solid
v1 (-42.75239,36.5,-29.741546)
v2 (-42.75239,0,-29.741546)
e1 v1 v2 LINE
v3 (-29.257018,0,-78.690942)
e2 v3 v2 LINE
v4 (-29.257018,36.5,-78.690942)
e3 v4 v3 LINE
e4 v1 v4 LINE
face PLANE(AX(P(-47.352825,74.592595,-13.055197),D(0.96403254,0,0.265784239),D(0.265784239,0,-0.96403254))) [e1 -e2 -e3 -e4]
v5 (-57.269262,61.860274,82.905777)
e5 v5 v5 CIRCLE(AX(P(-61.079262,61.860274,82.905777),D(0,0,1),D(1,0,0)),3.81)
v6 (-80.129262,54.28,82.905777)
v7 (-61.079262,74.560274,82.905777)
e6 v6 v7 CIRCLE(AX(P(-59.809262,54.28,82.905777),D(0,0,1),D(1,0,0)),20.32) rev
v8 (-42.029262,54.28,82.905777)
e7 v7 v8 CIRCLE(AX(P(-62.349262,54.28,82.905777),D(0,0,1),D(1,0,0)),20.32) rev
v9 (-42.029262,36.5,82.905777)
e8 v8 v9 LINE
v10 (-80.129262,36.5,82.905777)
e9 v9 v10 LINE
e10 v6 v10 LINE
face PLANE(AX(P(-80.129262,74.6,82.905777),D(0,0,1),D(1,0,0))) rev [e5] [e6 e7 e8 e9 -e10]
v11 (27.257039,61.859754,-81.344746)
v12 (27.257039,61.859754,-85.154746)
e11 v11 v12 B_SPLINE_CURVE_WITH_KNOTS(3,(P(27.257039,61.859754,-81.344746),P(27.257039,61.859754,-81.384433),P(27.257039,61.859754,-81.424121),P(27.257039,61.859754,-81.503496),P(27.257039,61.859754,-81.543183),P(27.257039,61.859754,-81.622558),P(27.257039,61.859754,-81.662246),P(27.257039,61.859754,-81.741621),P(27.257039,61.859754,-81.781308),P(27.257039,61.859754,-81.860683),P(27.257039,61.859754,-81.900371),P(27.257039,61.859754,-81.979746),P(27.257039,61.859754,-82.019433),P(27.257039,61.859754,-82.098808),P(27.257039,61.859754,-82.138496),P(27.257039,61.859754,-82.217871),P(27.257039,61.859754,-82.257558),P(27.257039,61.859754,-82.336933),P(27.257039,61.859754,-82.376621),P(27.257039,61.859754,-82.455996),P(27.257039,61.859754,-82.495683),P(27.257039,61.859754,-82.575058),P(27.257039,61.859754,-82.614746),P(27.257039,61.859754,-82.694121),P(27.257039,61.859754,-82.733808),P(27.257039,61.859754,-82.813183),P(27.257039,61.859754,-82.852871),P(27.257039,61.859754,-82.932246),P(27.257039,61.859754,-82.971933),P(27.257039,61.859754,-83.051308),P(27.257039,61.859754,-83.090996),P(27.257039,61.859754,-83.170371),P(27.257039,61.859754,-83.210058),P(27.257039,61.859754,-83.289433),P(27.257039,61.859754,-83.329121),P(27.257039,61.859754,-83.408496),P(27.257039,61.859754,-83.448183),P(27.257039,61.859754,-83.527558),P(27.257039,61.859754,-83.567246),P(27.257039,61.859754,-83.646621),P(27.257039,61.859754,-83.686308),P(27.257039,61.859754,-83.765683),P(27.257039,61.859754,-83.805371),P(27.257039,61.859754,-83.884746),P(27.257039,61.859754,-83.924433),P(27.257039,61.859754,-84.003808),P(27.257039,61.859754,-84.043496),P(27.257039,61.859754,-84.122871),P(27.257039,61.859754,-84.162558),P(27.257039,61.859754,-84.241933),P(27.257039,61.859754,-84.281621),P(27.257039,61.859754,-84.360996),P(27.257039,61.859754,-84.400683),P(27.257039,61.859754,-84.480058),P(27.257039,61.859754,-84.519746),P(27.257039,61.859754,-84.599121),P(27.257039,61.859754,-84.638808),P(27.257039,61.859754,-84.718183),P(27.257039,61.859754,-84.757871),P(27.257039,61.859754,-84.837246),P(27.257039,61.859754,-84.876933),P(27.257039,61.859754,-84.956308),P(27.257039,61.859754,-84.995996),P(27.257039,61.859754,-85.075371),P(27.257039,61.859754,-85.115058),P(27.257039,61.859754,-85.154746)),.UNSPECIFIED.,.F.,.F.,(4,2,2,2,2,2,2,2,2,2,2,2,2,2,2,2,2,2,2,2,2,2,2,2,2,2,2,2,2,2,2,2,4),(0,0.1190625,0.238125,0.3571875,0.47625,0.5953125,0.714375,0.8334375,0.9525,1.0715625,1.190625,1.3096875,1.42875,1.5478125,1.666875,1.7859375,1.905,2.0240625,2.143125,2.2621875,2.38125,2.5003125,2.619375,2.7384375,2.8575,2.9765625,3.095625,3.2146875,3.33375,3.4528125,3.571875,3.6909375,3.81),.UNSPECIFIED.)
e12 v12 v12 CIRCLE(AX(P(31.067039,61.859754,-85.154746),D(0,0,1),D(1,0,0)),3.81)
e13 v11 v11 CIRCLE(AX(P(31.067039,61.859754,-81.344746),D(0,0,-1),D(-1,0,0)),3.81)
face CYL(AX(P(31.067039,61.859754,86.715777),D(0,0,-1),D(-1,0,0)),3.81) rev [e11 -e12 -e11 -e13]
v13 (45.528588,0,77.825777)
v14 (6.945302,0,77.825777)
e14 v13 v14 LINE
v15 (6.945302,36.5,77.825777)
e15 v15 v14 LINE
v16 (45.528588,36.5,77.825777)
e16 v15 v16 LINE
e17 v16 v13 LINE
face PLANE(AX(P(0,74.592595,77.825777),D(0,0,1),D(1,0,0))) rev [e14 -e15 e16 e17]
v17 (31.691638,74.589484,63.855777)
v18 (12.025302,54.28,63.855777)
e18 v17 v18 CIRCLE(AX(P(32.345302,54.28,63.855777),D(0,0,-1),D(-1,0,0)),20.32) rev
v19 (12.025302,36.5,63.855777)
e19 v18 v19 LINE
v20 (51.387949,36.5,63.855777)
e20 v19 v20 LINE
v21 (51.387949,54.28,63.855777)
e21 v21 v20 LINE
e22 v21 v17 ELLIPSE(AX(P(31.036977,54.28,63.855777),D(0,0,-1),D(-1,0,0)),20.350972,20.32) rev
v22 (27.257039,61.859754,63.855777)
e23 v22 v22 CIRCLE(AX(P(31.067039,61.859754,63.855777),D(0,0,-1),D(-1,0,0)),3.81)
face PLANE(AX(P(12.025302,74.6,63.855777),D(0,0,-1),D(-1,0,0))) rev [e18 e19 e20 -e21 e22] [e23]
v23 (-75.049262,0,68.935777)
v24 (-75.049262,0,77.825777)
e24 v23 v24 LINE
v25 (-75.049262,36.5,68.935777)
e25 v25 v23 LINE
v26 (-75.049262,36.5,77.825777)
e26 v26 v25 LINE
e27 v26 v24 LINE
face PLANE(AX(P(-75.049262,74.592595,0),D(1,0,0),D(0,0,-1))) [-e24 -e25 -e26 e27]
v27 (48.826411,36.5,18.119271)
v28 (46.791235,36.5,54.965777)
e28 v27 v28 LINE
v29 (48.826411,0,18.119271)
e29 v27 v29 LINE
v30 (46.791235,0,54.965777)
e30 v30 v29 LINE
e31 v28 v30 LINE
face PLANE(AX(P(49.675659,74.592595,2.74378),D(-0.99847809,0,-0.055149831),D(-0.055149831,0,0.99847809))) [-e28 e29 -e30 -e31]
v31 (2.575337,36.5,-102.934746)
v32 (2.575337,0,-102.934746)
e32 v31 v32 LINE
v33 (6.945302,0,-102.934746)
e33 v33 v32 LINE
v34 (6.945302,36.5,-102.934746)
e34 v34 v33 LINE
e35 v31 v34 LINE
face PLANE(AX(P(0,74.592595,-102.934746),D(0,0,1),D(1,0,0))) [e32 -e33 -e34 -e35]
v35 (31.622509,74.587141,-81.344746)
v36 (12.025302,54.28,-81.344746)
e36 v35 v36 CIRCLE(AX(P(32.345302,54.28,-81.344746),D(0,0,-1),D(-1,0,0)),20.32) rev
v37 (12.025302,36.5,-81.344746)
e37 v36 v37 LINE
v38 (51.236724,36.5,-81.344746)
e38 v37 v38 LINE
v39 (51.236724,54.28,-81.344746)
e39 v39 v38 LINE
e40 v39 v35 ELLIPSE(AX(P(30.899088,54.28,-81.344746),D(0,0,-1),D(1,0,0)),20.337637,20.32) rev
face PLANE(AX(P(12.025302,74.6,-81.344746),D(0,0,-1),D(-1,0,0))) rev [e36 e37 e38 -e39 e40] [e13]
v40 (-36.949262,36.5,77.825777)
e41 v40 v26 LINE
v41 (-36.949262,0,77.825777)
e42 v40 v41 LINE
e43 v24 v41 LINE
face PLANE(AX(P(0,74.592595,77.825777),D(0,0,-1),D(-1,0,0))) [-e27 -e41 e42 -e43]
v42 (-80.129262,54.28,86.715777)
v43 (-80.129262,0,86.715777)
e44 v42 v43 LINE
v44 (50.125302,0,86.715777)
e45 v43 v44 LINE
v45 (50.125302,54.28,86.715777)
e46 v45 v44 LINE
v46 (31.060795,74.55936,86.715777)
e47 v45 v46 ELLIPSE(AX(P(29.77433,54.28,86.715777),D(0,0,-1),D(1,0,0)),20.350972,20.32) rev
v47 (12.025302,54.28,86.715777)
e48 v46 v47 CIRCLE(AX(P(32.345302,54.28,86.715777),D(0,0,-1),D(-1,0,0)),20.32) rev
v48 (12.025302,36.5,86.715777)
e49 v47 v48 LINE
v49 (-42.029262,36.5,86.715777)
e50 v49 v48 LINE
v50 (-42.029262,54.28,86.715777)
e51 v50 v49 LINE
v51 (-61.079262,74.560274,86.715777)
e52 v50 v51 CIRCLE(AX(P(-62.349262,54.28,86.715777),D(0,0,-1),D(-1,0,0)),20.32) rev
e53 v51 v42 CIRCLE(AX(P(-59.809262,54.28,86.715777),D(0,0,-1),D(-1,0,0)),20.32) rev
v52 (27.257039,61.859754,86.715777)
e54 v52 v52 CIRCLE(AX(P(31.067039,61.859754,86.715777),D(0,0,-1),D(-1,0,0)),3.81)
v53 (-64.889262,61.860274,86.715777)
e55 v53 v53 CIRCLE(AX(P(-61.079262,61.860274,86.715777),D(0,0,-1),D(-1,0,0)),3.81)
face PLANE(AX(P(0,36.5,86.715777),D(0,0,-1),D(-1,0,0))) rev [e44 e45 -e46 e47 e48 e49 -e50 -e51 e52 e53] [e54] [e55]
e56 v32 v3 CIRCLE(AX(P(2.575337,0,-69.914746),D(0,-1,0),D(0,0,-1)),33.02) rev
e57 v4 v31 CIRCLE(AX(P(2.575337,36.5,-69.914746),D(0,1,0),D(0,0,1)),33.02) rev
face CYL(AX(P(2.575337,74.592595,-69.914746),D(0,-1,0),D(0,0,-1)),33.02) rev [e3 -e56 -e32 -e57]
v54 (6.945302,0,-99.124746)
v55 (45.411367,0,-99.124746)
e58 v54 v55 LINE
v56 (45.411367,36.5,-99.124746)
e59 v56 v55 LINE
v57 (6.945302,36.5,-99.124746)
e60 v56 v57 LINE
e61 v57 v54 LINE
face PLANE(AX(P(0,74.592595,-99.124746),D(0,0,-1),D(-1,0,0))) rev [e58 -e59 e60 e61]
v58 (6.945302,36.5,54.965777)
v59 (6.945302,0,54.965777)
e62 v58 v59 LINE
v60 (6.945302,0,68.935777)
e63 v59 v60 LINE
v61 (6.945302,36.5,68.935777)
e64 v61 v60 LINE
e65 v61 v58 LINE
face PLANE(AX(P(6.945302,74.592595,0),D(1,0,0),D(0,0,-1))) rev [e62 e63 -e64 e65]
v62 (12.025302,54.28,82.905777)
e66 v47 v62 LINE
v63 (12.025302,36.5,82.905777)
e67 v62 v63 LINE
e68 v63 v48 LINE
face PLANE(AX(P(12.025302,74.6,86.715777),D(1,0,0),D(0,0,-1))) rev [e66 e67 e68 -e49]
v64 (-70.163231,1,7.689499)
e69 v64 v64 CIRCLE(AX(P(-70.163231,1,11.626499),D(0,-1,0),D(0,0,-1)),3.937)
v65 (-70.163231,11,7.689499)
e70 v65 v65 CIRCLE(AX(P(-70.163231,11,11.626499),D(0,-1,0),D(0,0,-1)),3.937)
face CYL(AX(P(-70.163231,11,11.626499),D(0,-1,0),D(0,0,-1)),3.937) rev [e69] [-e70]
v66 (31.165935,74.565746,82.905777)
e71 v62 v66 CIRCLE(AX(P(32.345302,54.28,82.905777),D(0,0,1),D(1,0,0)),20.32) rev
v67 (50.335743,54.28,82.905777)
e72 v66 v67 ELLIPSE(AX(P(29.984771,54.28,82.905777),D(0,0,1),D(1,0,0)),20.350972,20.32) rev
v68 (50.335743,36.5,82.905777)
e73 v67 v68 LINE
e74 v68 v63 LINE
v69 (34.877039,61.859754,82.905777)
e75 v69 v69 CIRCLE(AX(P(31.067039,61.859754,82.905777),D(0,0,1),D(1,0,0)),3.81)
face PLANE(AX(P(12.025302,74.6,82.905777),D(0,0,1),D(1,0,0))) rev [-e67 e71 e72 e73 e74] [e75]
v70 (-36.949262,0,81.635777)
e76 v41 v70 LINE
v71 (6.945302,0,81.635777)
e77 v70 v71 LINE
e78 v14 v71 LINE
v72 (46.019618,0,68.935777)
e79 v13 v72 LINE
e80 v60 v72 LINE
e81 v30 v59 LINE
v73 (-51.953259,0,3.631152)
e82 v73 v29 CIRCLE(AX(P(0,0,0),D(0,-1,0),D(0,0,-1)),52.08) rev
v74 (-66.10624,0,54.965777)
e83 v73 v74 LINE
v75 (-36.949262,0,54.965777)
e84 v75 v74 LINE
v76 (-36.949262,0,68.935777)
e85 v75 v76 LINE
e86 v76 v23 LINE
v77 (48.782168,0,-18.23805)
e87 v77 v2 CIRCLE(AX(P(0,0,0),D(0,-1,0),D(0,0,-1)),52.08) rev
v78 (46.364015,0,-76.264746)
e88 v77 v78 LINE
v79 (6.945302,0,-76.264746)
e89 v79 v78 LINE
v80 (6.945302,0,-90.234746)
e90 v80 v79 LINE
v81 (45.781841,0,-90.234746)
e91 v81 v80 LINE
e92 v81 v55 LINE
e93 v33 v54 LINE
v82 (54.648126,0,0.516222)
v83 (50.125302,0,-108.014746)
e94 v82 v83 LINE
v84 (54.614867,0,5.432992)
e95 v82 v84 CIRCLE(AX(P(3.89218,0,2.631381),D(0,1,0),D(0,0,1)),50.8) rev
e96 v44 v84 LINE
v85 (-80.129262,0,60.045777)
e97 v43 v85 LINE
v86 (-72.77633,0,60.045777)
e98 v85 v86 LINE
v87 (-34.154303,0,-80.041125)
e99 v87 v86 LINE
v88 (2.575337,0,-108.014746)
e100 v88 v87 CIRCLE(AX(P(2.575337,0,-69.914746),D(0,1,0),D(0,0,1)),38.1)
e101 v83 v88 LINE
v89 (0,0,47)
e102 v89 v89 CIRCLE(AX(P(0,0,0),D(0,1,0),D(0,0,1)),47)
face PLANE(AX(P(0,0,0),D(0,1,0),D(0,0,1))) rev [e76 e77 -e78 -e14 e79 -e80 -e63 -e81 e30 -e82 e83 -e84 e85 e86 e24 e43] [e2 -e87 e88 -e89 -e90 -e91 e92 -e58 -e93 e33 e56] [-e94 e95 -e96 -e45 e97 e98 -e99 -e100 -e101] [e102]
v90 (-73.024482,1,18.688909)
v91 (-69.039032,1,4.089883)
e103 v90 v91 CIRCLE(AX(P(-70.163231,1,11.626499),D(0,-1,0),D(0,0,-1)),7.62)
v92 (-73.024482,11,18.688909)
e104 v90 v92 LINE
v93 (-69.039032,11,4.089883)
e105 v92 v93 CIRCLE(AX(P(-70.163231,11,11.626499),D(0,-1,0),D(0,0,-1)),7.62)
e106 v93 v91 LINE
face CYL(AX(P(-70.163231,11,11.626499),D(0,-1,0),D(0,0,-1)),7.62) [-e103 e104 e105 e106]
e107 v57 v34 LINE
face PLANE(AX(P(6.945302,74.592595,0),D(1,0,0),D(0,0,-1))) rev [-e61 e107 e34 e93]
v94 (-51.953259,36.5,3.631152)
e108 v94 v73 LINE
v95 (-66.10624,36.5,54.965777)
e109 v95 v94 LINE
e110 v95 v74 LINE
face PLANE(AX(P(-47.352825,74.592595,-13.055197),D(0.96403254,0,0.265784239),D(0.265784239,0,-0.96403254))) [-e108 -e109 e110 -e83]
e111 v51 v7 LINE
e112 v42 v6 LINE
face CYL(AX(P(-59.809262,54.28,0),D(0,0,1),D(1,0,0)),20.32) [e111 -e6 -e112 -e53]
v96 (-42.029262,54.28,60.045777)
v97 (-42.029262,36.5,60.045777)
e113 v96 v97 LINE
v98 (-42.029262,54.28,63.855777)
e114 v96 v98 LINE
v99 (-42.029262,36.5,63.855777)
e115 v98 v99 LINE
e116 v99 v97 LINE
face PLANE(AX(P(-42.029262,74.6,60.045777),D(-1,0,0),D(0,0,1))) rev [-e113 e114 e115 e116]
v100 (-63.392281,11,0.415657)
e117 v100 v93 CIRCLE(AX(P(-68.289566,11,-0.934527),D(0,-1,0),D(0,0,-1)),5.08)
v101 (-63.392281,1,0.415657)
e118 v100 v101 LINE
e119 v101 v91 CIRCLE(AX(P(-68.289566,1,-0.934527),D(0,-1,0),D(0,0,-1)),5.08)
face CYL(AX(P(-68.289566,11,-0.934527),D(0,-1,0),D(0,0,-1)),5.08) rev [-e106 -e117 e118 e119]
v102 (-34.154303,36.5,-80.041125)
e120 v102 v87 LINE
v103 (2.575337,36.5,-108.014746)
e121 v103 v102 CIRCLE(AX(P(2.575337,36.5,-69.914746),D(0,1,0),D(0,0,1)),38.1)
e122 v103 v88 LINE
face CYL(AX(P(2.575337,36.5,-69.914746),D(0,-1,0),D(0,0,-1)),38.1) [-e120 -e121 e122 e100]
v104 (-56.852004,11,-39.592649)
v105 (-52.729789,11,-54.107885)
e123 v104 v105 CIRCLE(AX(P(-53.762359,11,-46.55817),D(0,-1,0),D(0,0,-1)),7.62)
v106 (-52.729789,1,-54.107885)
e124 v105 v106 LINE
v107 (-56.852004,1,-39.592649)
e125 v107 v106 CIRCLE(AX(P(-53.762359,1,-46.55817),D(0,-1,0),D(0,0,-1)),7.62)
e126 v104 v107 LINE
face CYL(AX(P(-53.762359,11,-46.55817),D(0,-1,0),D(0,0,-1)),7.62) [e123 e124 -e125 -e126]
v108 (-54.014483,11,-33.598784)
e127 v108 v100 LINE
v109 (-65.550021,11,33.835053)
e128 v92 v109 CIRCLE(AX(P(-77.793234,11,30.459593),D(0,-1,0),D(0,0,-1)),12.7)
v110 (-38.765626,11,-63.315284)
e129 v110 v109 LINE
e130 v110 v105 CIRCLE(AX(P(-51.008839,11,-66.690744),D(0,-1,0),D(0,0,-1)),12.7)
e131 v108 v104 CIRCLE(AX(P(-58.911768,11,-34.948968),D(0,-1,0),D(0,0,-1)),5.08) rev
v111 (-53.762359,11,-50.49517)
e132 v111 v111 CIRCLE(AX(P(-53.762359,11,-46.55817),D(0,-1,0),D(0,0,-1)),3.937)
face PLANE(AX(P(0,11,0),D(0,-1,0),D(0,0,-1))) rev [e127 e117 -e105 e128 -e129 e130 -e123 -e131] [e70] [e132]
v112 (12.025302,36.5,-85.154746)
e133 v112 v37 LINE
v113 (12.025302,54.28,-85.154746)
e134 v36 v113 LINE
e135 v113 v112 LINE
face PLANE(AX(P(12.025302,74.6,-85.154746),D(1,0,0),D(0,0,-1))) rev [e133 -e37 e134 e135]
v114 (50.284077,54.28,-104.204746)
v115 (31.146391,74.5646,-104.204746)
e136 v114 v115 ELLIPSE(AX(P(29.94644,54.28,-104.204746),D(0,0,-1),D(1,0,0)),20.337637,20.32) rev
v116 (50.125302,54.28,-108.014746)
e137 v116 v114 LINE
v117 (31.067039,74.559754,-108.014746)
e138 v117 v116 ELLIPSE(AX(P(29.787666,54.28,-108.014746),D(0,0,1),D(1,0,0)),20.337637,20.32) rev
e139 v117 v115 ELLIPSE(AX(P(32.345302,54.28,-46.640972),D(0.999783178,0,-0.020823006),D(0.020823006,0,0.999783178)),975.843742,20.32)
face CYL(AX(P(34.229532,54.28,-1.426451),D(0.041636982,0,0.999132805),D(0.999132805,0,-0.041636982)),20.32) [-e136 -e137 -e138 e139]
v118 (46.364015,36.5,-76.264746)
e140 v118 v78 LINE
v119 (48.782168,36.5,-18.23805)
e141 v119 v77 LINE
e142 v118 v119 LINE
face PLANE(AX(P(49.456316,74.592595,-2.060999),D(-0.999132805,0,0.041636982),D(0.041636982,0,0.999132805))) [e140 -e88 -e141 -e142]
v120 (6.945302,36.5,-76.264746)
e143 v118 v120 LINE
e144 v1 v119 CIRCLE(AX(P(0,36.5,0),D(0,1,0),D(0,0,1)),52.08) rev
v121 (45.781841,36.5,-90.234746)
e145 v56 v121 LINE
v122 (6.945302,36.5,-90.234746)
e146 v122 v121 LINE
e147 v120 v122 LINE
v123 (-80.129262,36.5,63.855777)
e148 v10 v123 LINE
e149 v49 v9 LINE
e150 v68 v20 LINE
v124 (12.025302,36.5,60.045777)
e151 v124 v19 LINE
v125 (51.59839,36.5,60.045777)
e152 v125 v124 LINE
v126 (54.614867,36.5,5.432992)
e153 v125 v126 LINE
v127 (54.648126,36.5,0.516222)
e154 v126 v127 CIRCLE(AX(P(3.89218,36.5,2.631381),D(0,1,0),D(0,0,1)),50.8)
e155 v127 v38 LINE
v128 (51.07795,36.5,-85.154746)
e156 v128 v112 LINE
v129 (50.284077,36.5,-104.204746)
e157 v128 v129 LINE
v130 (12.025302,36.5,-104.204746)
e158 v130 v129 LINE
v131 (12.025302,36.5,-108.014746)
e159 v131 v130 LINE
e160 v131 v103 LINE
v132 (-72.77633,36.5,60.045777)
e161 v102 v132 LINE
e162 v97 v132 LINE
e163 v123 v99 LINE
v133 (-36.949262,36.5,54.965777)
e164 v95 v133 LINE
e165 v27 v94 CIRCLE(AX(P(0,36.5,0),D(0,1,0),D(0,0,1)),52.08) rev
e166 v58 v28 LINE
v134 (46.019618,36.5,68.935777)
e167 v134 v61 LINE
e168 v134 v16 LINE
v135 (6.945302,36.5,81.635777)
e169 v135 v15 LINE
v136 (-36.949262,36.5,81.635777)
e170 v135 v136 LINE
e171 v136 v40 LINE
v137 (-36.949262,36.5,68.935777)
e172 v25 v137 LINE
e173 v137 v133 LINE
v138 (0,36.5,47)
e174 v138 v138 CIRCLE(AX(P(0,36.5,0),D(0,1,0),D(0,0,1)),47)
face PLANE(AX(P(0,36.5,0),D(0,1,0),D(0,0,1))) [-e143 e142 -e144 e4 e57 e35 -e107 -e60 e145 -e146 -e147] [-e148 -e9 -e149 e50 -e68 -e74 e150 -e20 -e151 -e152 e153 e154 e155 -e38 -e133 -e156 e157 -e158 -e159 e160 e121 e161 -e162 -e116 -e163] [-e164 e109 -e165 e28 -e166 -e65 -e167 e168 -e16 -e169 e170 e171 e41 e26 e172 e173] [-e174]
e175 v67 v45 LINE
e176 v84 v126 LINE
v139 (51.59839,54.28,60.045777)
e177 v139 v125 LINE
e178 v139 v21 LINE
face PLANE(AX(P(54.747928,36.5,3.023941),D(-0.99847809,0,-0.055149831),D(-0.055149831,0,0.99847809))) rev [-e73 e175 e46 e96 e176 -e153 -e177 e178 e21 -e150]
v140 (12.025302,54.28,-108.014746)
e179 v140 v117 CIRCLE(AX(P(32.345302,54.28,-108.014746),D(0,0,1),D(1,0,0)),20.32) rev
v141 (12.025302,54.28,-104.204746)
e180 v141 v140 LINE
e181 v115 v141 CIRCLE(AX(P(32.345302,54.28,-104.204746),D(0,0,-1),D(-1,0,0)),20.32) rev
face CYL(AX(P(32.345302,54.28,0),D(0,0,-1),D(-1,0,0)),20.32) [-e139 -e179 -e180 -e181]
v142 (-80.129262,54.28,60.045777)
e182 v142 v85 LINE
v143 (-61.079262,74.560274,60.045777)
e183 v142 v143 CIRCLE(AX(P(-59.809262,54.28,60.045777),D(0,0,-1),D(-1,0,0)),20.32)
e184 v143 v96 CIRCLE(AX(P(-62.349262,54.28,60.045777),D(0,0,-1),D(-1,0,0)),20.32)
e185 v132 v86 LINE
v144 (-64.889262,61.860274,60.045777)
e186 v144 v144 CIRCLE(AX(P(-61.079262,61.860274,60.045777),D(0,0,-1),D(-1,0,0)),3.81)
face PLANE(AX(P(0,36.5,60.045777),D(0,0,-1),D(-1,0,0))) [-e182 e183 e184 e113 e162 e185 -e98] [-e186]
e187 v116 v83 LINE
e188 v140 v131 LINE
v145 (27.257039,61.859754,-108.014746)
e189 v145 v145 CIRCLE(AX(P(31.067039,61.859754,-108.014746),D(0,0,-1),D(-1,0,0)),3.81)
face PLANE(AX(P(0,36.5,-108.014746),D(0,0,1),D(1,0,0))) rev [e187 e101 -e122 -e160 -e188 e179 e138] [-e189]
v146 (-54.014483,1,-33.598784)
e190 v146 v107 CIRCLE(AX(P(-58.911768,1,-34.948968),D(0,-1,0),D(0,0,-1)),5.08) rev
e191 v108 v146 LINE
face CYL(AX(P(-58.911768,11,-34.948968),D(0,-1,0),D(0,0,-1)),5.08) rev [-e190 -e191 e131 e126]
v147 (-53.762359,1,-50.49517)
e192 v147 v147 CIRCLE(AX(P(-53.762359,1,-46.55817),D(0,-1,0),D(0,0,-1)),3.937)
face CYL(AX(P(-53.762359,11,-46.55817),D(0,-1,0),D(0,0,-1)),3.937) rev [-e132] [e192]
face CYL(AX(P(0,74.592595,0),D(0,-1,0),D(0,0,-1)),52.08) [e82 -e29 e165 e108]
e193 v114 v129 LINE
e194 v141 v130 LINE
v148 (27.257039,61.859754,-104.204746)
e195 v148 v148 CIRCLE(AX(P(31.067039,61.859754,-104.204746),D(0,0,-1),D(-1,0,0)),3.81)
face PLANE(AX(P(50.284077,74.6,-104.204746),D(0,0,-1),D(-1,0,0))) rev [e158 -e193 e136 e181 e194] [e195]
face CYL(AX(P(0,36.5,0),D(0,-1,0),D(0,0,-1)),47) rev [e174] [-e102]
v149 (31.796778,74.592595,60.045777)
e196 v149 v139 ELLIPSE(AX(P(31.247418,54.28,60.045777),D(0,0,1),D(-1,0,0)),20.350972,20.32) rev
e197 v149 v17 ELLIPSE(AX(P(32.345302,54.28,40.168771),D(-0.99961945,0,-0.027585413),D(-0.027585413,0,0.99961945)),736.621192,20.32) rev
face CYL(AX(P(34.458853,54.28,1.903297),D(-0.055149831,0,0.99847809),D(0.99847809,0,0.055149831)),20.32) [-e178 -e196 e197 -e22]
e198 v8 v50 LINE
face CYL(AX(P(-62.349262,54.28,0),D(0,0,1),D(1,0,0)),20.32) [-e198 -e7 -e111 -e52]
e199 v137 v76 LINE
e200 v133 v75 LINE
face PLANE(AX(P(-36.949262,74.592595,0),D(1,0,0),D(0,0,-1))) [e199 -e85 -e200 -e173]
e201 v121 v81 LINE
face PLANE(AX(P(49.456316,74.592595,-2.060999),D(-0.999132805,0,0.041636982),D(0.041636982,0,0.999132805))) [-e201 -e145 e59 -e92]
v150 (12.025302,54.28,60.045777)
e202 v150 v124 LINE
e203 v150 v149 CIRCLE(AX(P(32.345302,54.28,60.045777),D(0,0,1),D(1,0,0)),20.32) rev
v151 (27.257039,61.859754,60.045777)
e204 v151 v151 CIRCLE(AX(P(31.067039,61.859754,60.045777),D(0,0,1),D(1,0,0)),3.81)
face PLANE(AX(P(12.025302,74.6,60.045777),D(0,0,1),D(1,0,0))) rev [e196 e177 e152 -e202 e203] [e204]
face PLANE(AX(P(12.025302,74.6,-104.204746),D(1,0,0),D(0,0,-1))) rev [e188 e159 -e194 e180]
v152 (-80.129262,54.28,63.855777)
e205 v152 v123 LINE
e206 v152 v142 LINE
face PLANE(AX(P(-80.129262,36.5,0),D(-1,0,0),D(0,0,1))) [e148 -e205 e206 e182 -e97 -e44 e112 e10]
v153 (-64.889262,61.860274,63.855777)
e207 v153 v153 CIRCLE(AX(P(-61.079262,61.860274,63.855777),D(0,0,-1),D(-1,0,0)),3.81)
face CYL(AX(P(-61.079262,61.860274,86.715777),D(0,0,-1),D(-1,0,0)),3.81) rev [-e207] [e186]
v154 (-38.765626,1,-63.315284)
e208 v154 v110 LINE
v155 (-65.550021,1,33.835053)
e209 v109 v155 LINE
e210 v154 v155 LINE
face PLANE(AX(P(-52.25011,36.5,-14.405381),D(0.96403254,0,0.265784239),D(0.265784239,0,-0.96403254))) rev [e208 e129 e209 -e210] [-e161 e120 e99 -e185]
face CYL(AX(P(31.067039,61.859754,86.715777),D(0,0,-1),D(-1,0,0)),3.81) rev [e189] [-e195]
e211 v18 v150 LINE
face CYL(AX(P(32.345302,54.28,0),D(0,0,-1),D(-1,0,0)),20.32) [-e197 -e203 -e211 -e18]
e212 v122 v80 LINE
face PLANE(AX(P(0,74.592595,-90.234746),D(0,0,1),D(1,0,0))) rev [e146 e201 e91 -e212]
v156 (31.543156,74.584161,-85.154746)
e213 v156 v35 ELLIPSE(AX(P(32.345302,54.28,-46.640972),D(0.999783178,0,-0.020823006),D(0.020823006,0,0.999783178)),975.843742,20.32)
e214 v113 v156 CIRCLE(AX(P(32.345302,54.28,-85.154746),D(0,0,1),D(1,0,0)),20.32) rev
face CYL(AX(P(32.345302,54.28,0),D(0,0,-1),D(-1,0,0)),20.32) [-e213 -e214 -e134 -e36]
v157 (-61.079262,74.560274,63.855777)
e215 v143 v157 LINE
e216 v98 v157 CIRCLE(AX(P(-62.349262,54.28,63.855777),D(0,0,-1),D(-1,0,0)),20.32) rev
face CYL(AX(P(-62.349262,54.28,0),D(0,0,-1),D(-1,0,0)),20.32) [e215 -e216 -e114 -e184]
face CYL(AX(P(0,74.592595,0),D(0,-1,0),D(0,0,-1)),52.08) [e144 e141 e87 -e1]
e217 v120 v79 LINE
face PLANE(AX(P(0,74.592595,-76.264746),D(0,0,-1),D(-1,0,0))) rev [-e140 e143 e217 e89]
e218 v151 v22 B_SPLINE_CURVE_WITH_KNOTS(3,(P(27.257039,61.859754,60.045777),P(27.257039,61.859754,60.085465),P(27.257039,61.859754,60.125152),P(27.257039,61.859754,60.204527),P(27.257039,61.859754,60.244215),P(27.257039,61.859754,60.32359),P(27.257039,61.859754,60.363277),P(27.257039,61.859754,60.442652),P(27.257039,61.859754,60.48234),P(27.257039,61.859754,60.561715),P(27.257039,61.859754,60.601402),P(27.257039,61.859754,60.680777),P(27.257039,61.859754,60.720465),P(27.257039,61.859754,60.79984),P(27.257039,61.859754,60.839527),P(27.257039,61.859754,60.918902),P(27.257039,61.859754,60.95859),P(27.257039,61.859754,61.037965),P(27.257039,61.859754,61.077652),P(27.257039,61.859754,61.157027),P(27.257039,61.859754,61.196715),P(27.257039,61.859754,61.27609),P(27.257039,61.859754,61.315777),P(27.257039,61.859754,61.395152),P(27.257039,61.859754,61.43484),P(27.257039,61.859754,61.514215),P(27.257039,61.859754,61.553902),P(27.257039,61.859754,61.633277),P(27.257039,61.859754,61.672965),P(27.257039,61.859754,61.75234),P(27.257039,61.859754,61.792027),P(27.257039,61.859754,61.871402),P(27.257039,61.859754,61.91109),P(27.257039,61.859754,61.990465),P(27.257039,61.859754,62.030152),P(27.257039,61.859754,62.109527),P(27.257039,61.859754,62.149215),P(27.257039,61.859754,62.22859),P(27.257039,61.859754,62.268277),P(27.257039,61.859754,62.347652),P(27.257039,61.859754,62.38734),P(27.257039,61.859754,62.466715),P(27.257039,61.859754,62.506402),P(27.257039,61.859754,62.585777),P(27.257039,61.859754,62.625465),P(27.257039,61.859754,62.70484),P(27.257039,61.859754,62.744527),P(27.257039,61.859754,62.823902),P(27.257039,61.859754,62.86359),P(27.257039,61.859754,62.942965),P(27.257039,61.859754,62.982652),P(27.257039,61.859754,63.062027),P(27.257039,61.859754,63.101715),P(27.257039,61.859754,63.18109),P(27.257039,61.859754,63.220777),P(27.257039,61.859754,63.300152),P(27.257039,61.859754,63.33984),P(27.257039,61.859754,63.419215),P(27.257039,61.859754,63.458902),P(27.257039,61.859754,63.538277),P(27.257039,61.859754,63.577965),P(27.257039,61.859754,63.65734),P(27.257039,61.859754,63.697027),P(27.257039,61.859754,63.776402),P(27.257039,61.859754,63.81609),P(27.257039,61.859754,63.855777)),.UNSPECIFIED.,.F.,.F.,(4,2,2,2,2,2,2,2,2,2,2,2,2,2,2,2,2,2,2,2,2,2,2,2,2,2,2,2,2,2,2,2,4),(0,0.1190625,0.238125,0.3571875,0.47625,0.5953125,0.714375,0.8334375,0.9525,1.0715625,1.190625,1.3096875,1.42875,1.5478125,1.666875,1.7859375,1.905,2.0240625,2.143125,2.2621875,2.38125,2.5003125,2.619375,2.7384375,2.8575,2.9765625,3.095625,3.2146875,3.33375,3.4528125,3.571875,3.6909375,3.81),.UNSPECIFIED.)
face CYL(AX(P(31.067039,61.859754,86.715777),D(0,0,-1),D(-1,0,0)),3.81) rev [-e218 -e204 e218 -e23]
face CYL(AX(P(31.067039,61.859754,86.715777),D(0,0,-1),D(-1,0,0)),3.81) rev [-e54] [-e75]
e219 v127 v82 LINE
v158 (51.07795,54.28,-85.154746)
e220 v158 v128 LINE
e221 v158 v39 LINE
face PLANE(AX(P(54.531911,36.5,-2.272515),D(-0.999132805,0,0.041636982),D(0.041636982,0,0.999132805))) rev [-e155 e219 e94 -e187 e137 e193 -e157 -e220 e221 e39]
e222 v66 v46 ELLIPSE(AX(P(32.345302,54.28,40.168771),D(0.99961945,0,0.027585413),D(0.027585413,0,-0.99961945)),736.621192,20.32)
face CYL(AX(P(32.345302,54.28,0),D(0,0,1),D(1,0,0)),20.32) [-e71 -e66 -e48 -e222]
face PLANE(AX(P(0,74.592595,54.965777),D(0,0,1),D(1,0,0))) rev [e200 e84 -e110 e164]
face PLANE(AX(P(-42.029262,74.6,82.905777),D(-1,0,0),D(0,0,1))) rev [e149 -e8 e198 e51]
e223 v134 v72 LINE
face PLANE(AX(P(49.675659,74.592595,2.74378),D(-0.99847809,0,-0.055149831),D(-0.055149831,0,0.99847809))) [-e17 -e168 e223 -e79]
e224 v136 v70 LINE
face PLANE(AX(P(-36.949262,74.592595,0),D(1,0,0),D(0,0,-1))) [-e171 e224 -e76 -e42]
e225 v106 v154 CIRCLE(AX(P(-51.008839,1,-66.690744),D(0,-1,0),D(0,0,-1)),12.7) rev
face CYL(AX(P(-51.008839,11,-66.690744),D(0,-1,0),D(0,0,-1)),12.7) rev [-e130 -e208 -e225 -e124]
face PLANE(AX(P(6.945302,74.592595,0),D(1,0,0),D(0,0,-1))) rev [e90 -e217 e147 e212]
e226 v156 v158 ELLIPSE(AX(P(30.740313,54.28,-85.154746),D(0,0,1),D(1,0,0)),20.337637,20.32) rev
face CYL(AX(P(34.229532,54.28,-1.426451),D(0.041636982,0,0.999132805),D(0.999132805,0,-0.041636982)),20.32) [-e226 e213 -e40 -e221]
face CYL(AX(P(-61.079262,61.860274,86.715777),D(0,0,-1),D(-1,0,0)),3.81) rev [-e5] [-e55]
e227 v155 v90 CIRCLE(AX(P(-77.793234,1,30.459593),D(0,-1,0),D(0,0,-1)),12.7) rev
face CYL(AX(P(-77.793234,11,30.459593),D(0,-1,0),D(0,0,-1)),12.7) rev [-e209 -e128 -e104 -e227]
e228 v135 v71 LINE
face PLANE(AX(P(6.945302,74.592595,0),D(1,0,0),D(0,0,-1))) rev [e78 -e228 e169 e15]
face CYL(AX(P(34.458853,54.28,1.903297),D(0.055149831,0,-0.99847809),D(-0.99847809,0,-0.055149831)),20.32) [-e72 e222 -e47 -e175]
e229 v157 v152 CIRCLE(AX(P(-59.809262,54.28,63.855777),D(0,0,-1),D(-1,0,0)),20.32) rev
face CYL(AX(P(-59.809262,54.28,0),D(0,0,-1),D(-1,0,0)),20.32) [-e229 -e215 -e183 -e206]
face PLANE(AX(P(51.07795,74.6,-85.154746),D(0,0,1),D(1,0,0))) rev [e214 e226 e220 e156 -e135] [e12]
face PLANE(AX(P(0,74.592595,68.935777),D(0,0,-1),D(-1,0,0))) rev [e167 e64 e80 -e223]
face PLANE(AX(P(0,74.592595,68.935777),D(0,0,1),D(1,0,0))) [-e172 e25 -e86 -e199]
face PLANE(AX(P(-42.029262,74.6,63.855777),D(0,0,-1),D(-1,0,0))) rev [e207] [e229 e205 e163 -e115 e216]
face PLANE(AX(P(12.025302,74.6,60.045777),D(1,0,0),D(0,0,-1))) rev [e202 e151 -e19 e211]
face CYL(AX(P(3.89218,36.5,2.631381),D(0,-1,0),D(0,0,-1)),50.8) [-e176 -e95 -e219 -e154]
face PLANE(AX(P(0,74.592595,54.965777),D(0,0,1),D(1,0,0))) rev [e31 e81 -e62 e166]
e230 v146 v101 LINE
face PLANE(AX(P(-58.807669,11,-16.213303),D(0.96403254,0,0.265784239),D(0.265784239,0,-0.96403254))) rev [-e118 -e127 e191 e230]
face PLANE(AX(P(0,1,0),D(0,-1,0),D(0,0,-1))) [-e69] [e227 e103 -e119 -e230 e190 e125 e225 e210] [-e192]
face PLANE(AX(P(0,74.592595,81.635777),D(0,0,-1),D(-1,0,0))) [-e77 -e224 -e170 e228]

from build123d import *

# Parameters (mm, degrees)
SKETCH1_R            = 47
BASE_DEPTH           = 36.5
SKETCH2_W            = 38.1
SKETCH2_H            = 3.81
A_ARMS_DEPTH         = 38.1
FILLET_A_ARM_TAB_F_R = 20.32
FILLET2_R            = 50.8
SKETCH3_R            = 3.937
BOSS_EXTRUDE3_DEPTH  = 10
FILLET3_R            = 12.7
SKETCH6_R            = 3.81
TAB_HOLES_1_DEPTH    = 224.393667494
SKETCH7_R            = 3.81
TAB_HOLES_2_DEPTH    = 201.571915927
CUT_EXTRUDE2_DEPTH   = 154.791870017


with BuildPart() as part:
    # Sketch1 → Base (new body)
    with BuildSketch(Plane(origin=(0, 0, 0), x_dir=(1, 0, 0), z_dir=(0, 1, 0))):
        with BuildLine():
            Line((-80.129262367, -86.715777422), (50.125302211, -86.715777422))
            Line((50.125302211, -86.715777422), (54.750608495, -2.975412689))
            Line((54.750608495, -2.975412689), (50.125302211, 108.014745968))
            Line((50.125302211, 108.014745968), (2.575336515, 108.014745968))
            ThreePointArc((2.575336515, 108.014745968), (-20.509235608, 100.225016997), (-34.154303257, 80.041125489))
            Line((-34.154303257, 80.041125489), (-72.776330416, -60.045777422))
            Line((-72.776330416, -60.045777422), (-80.129262367, -60.045777422))
            Line((-80.129262367, -60.045777422), (-80.129262367, -86.715777422))
        make_face()
        with Locations(Location((0, 0, 0), (0, 0, 270))):
            Circle(SKETCH1_R, mode=Mode.SUBTRACT)
    extrude(amount=BASE_DEPTH)

    # Sketch2 → A-Arms (add)
    with BuildSketch(Plane(origin=(0, 36.5, 0), x_dir=(1, 0, 0), z_dir=(0, 1, 0))):
        Polygon((50.125302211, 108.014745968), (50.284076801, 104.204745968), (12.025302211, 104.204745968), (12.025302211, 108.014745968), align=None)
        Polygon((12.025302211, -82.905777422), (50.335743341, -82.905777422), (50.125302211, -86.715777422), (12.025302211, -86.715777422), align=None)
        Polygon((12.025302211, 85.154745968), (12.025302211, 81.344745968), (51.236724342, 81.344745968), (51.077949751, 85.154745968), align=None)
        Polygon((12.025302211, -60.045777422), (51.598390118, -60.045777422), (51.387948988, -63.855777422), (12.025302211, -63.855777422), align=None)
        with Locations((-61.079262367, -61.950777422)):
            Rectangle(SKETCH2_W, SKETCH2_H)
        with Locations((-61.079262367, -84.810777422)):
            Rectangle(SKETCH2_W, SKETCH2_H)
    extrude(amount=A_ARMS_DEPTH)

    # Fillet a-arm tab f
    # the kernel refuses this fillet: 20.32 mm, written as the material it takes off along each edge
    with BuildSketch(Plane(origin=(53.137354768, 74.6, 32.183090452), x_dir=(0, -1, 0), z_dir=(-0.055149831244914994, 0, 0.9984780899517313)), Plane(origin=(54.400001545, 74.6, 9.323090452), x_dir=(0, -1, 0), z_dir=(-0.055149831244913544, 0, 0.9984780899517313))) as fillet_a_arm_tab_f_piece_1:
        with BuildLine():
            CenterArc((FILLET_A_ARM_TAB_F_R, -FILLET_A_ARM_TAB_F_R), FILLET_A_ARM_TAB_F_R, 90, 90)
            Line((0, -FILLET_A_ARM_TAB_F_R), (0, 0))
            Line((0, 0), (FILLET_A_ARM_TAB_F_R, 0))
        make_face()
    extrude(amount=105.415807315, mode=Mode.SUBTRACT)
    with BuildSketch(Plane(origin=(12.025302211, 74.6, 137.515777422), x_dir=(1, 0, 0), z_dir=(0, 0, -1)), Plane(origin=(12.025302211, 74.6, -135.954745968), x_dir=(0, -1, 0), z_dir=(0, 0, 1)), Plane(origin=(-80.129262367, 74.6, 137.515777422), x_dir=(1, 0, 0), z_dir=(0, 0, -1))) as fillet_a_arm_tab_f_piece_2:
        with BuildLine():
            CenterArc((FILLET_A_ARM_TAB_F_R, FILLET_A_ARM_TAB_F_R), FILLET_A_ARM_TAB_F_R, 180, 90)
            Line((0, FILLET_A_ARM_TAB_F_R), (0, 0))
            Line((0, 0), (FILLET_A_ARM_TAB_F_R, 0))
        make_face()
    extrude(amount=105.41, mode=Mode.SUBTRACT)
    with BuildSketch(Plane(origin=(12.025302211, 74.6, 114.655777422), x_dir=(0, -1, 0), z_dir=(0, 0, -1)), Plane(origin=(12.025302211, 74.6, -53.404745968), x_dir=(0, -1, 0), z_dir=(0, 0, -1)), Plane(origin=(-42.029262367, 74.6, 32.105777422), x_dir=(0, -1, 0), z_dir=(0, 0, 1)), Plane(origin=(-42.029262367, 74.6, 114.655777422), x_dir=(-1, 0, 0), z_dir=(0, 0, -1)), Plane(origin=(-80.129262367, 74.6, 9.245777422), x_dir=(1, 0, 0), z_dir=(0, 0, 1))) as fillet_a_arm_tab_f_piece_3:
        with BuildLine():
            CenterArc((FILLET_A_ARM_TAB_F_R, -FILLET_A_ARM_TAB_F_R), FILLET_A_ARM_TAB_F_R, 90, 90)
            Line((0, -FILLET_A_ARM_TAB_F_R), (0, 0))
            Line((0, 0), (FILLET_A_ARM_TAB_F_R, 0))
        make_face()
    extrude(amount=105.41, mode=Mode.SUBTRACT)
    with BuildSketch(Plane(origin=(53.351883028, 74.6, -30.588799481), x_dir=(0, -1, 0), z_dir=(-0.04163698201983484, 0, -0.9991328048504263)), Plane(origin=(48.010143525, 74.6, -158.770692454), x_dir=(-0.9991328048504262, 0, 0.04163698201983669), z_dir=(0.0416369820198367, 0, 0.9991328048504262))) as fillet_a_arm_tab_f_piece_4:
        with BuildLine():
            CenterArc((FILLET_A_ARM_TAB_F_R, FILLET_A_ARM_TAB_F_R), FILLET_A_ARM_TAB_F_R, 180, 90)
            Line((0, FILLET_A_ARM_TAB_F_R), (0, 0))
            Line((0, 0), (FILLET_A_ARM_TAB_F_R, 0))
        make_face()
    extrude(amount=105.413306881, mode=Mode.SUBTRACT)

    # Fillet2
    # the kernel refuses this fillet: 50.8 mm, written as the material it takes off along each edge
    with BuildSketch(Plane(origin=(54.750608495, -6.153313098, 2.975412689), x_dir=(-0.05514983124491408, 0, 0.9984780899517313), z_dir=(0, 1, 0))) as fillet2_piece_1:
        with BuildLine():
            CenterArc((FILLET2_R * 0.0484512842399, -FILLET2_R), FILLET2_R, 90, 5.547769732)
            Line((-FILLET2_R * 0.0482243356174, -FILLET2_R * 0.00468405793677), (0, 0))
            Line((0, 0), (FILLET2_R * 0.0484512842399, 0))
        make_face()
    extrude(amount=48.806626197, mode=Mode.SUBTRACT)

    # Sketch3 → Boss-Extrude3 (add)
    with BuildSketch(Plane(origin=(0, 1, 0), x_dir=(-1, 0, 0), z_dir=(0, -1, 0))):
        with BuildLine():
            Line((42.093323872, 51.245308907), (62.210800727, -21.723285296))
            Line((62.210800727, -21.723285296), (72.188506448, -18.972426984))
            ThreePointArc((72.188506448, -18.972426984), (77.618129068, -10.048878041), (69.039031874, -4.089883254))
            ThreePointArc((69.039031874, -4.089883254), (65.518990894, -3.323443269), (63.392280792, -0.415656673))
            Line((63.392280792, -0.415656673), (54.014483076, 33.598783658))
            ThreePointArc((54.014483076, 33.598783658), (54.320283062, 37.122596493), (56.852004495, 39.592648541))
            ThreePointArc((56.852004495, 39.592648541), (60.937845875, 49.122693965), (51.737082765, 53.904097917))
            Line((51.737082765, 53.904097917), (42.093323872, 51.245308907))
        make_face()
        with Locations(Location((70.163230544, -11.62649903, 0), (0, 0, 90))):
            Circle(SKETCH3_R, mode=Mode.SUBTRACT)
        with Locations(Location((53.76235867, 46.558169963, 0), (0, 0, 90))):
            Circle(SKETCH3_R, mode=Mode.SUBTRACT)
    extrude(amount=-BOSS_EXTRUDE3_DEPTH)

    # Fillet3
    # the kernel refuses this fillet: 12.7 mm, written as the material it adds along each edge
    with BuildSketch(Plane(origin=(-42.093323872, 1, -51.245308907), x_dir=(0.26578423939908447, 0, -0.9640325399523867), z_dir=(0, 1, 0))) as fillet3_piece_1:
        with BuildLine():
            CenterArc((12.520298407, 12.7), FILLET3_R, 187.62557017, 82.37442983)
            Line((-0.067388097, 11.014725997), (-1.326156748, 10.846198597))
            ThreePointArc((-1.326156748, 10.846198597), (-1.27, 10.003561596), (-1.27, 0))
            Line((-1.27, 0), (0, -1.27))
            Line((0, -1.27), (12.520298407, -1.27))
            Line((12.520298407, -1.27), (12.520298407, 0))
        make_face()
    extrude(amount=10)
    with BuildSketch(Plane(origin=(-62.210800727, 1, 21.723285296), x_dir=(-0.26578423939908535, 0, 0.9640325399523866), z_dir=(0, 1, 0))) as fillet3_piece_2:
        with BuildLine():
            CenterArc((12.563650525, -12.7), FILLET3_R, 90, 83.358813764)
            Line((-0.051131053, -11.231229858), (-1.312609211, -11.084352844))
            ThreePointArc((-1.312609211, -11.084352844), (-1.27, -10.349967773), (-1.27, 0))
            Line((-1.27, 0), (0, 1.27))
            Line((0, 1.27), (12.563650525, 1.27))
            Line((12.563650525, 1.27), (12.563650525, 0))
        make_face()
    extrude(amount=10)

    # Sketch6 → Tab Holes 1 (cut, through all)
    with BuildSketch(Plane(origin=(0, 0, -108.014745968), x_dir=(-1, 0, 0), z_dir=(0, 0, -1))):
        with Locations((-31.067038594, 61.859754489)):
            Circle(SKETCH6_R)
    extrude(amount=-TAB_HOLES_1_DEPTH, mode=Mode.SUBTRACT)

    # Sketch7 → Tab Holes 2 (cut, through all)
    with BuildSketch(Plane(origin=(0, 0, 60.045777422), x_dir=(-1, 0, 0), z_dir=(0, 0, -1))):
        with Locations((61.079262367, 61.860273667)):
            Circle(SKETCH7_R)
    extrude(amount=-TAB_HOLES_2_DEPTH, mode=Mode.SUBTRACT)

    # Sketch8 → Cut-Extrude2 (cut, through all)
    with BuildSketch(Plane(origin=(0, 0, 0), x_dir=(1, 0, 0), z_dir=(0, 1, 0))):
        with BuildLine():
            Line((-29.257017954, 78.690941553), (-42.752390199, 29.741545559))
            ThreePointArc((-42.752390199, 29.741545559), (6.494009323, 51.673535228), (48.782168121, 18.238050153))
            Line((48.782168121, 18.238050153), (46.36401462, 76.264745968))
            Line((46.36401462, 76.264745968), (6.945302211, 76.264745968))
            Line((6.945302211, 76.264745968), (6.945302211, 90.234745968))
            Line((6.945302211, 90.234745968), (45.781841123, 90.234745968))
            Line((45.781841123, 90.234745968), (45.41136708, 99.124745968))
            Line((45.41136708, 99.124745968), (6.945302211, 99.124745968))
            Line((6.945302211, 99.124745968), (6.945302211, 102.934745968))
            Line((6.945302211, 102.934745968), (2.575336515, 102.934745968))
            ThreePointArc((2.575336515, 102.934745968), (-17.431292658, 96.183647526), (-29.257017954, 78.690941553))
        make_face()
        with BuildLine():
            Line((-75.049262367, -77.825777422), (-36.949262367, -77.825777422))
            Line((-36.949262367, -77.825777422), (-36.949262367, -81.635777422))
            Line((-36.949262367, -81.635777422), (6.945302211, -81.635777422))
            Line((6.945302211, -81.635777422), (6.945302211, -77.825777422))
            Line((6.945302211, -77.825777422), (45.528588426, -77.825777422))
            Line((45.528588426, -77.825777422), (46.019617728, -68.935777422))
            Line((46.019617728, -68.935777422), (6.945302211, -68.935777422))
            Line((6.945302211, -68.935777422), (6.945302211, -54.965777422))
            Line((6.945302211, -54.965777422), (46.791235203, -54.965777422))
            Line((46.791235203, -54.965777422), (48.826411186, -18.119270701))
            ThreePointArc((48.826411186, -18.119270701), (-7.410849482, -51.550031134), (-51.953259135, -3.631152049))
            Line((-51.953259135, -3.631152049), (-66.106240279, -54.965777422))
            Line((-66.106240279, -54.965777422), (-36.949262367, -54.965777422))
            Line((-36.949262367, -54.965777422), (-36.949262367, -68.935777422))
            Line((-36.949262367, -68.935777422), (-75.049262367, -68.935777422))
            Line((-75.049262367, -68.935777422), (-75.049262367, -77.825777422))
        make_face()
    extrude(amount=CUT_EXTRUDE2_DEPTH, mode=Mode.SUBTRACT)


solid = part.part
